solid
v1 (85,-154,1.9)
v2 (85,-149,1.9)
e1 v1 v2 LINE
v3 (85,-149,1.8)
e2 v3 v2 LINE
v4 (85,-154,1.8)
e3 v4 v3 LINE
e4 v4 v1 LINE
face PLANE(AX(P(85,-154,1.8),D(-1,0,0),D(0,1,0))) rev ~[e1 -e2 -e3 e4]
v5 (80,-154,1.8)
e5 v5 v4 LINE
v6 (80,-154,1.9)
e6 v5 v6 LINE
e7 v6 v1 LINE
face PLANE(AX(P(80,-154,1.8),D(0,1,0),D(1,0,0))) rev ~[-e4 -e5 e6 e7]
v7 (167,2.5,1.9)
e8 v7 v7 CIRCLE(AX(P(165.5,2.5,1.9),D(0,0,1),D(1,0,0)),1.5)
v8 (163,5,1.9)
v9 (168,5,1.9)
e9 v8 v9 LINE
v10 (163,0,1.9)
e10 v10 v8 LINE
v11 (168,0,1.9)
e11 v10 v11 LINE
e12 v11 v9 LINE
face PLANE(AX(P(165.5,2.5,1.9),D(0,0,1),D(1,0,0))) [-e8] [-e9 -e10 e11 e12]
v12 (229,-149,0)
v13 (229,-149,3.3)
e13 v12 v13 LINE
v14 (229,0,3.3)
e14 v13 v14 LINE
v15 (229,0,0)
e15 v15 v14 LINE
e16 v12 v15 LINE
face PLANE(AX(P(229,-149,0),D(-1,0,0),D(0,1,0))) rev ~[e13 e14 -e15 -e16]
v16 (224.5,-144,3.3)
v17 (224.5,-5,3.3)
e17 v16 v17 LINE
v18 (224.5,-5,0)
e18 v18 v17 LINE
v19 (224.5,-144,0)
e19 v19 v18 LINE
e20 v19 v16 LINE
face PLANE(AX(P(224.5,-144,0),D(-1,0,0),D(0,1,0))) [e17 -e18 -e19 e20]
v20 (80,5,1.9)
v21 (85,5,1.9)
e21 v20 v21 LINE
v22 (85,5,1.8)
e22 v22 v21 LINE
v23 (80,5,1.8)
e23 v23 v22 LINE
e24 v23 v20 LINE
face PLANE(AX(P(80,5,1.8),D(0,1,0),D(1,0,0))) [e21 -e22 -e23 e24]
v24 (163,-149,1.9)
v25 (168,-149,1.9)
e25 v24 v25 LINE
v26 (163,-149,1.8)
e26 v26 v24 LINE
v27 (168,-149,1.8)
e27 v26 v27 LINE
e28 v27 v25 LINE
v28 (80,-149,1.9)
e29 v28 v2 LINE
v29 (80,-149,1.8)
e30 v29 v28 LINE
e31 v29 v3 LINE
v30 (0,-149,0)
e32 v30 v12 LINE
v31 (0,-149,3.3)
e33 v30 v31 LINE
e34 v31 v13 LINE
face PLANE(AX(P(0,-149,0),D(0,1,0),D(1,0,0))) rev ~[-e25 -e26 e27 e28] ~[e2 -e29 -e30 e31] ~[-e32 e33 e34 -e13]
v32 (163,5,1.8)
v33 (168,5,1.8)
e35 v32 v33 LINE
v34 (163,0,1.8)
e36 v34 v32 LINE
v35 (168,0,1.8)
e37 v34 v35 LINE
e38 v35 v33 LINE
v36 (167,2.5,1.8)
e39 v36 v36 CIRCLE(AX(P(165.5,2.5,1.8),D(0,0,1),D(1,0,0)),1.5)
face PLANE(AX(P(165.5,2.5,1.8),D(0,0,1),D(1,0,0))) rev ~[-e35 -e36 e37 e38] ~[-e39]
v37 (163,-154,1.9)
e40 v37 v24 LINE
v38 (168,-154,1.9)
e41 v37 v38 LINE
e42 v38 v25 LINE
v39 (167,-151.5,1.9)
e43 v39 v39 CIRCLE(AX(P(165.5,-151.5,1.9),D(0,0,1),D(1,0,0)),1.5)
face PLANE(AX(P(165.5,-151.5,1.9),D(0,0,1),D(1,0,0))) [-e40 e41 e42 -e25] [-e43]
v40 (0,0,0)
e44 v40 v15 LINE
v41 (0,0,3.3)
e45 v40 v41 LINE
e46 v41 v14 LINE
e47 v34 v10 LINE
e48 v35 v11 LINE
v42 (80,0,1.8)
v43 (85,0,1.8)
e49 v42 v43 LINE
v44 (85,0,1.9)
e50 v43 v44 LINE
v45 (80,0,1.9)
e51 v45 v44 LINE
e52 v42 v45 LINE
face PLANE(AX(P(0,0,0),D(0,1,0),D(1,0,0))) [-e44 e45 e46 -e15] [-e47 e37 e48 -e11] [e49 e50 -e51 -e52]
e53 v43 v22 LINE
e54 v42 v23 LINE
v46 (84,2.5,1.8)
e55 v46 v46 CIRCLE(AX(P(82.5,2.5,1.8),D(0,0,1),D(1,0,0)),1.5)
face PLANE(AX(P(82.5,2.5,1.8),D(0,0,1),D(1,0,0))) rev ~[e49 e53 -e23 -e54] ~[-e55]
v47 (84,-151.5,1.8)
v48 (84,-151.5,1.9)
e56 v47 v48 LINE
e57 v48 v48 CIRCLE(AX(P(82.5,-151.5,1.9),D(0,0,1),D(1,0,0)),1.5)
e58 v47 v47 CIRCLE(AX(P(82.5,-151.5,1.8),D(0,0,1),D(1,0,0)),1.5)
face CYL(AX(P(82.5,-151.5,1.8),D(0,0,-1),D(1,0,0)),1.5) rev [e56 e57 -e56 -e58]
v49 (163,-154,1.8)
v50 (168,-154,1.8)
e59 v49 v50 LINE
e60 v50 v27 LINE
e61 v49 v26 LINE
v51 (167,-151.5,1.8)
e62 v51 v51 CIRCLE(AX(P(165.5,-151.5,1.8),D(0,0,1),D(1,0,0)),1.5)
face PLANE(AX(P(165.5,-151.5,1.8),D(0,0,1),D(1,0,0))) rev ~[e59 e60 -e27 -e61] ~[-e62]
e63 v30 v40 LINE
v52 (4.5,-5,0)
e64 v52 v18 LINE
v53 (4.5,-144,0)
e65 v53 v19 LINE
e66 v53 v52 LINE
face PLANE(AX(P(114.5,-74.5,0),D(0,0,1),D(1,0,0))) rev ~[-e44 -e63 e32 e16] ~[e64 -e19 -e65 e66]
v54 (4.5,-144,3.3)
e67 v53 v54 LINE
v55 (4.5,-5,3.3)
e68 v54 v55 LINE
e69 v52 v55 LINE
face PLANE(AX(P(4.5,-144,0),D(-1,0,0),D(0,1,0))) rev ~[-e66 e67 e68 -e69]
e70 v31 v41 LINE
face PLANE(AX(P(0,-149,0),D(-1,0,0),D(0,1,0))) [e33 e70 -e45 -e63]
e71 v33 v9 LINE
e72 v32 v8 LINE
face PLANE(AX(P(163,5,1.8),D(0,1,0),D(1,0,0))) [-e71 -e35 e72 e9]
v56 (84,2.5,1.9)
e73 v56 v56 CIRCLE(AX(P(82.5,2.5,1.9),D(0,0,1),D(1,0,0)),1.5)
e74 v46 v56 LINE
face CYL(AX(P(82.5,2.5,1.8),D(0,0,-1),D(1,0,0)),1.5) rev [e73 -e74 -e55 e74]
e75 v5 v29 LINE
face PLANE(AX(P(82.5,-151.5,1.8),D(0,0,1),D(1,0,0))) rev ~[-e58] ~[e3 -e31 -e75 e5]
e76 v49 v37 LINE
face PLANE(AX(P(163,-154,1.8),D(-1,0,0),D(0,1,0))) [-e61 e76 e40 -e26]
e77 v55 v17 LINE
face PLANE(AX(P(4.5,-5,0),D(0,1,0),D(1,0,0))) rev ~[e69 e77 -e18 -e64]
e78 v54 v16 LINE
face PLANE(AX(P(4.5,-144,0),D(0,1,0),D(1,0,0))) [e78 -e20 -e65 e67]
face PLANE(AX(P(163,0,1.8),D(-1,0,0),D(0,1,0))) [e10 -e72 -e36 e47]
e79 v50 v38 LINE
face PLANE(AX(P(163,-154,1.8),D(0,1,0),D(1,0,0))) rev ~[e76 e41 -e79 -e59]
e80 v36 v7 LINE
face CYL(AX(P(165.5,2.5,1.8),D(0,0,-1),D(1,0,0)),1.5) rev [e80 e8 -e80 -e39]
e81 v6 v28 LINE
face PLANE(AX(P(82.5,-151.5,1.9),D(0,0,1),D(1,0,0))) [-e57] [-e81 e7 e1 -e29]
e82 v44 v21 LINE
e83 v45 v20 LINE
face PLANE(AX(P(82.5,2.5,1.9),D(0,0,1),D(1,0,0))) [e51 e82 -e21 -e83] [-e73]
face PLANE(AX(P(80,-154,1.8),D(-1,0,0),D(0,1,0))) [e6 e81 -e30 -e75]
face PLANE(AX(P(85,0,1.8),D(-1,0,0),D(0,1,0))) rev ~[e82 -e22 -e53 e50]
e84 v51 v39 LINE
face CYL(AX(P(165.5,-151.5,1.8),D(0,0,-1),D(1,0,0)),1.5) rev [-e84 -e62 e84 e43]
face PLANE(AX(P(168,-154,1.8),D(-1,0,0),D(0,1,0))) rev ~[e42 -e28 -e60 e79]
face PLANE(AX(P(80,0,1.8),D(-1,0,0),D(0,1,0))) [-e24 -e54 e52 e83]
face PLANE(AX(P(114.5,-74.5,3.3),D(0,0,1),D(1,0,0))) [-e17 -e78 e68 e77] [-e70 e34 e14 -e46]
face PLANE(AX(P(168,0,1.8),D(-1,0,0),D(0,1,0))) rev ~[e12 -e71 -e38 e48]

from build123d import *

# Parameters (mm, degrees)
F0_W     = 229
F0_H     = 149
F0_W_2   = 220
F0_H_2   = 139
F1_DEPTH = 3.3
F3_W     = 5
F3_H     = 5
F3_R     = 1.5
F4_DEPTH = 0.1


# Not quite as in the source:
# - a feature names something its author has since deleted; it is built from what else it names


with BuildPart() as f1:
    # F0 (on Top) → F1 (new body)
    with BuildSketch(Plane.XY):
        with Locations((114.5, -74.5)):
            Rectangle(F0_W, F0_H)
        with Locations((114.5, -74.5)):
            Rectangle(F0_W_2, F0_H_2, mode=Mode.SUBTRACT)
    extrude(amount=F1_DEPTH)

    # F3 (on offset) → F4 (join)
    with BuildSketch(Plane.XY.offset(1.8)):
        with Locations((165.5, 2.5)):
            Rectangle(F3_W, F3_H)
        with Locations((165.5, 2.5)):
            Circle(F3_R, mode=Mode.SUBTRACT)
        with Locations((82.5, -151.5)):
            Rectangle(F3_W, F3_H)
        with Locations((82.5, -151.5)):
            Circle(F3_R, mode=Mode.SUBTRACT)
        with Locations((165.5, -151.5)):
            Rectangle(F3_W, F3_H)
        with Locations((165.5, -151.5)):
            Circle(F3_R, mode=Mode.SUBTRACT)
        with Locations((82.5, 2.5)):
            Rectangle(F3_W, F3_H)
        with Locations((82.5, 2.5)):
            Circle(F3_R, mode=Mode.SUBTRACT)
    extrude(amount=F4_DEPTH)


solid = f1.part
